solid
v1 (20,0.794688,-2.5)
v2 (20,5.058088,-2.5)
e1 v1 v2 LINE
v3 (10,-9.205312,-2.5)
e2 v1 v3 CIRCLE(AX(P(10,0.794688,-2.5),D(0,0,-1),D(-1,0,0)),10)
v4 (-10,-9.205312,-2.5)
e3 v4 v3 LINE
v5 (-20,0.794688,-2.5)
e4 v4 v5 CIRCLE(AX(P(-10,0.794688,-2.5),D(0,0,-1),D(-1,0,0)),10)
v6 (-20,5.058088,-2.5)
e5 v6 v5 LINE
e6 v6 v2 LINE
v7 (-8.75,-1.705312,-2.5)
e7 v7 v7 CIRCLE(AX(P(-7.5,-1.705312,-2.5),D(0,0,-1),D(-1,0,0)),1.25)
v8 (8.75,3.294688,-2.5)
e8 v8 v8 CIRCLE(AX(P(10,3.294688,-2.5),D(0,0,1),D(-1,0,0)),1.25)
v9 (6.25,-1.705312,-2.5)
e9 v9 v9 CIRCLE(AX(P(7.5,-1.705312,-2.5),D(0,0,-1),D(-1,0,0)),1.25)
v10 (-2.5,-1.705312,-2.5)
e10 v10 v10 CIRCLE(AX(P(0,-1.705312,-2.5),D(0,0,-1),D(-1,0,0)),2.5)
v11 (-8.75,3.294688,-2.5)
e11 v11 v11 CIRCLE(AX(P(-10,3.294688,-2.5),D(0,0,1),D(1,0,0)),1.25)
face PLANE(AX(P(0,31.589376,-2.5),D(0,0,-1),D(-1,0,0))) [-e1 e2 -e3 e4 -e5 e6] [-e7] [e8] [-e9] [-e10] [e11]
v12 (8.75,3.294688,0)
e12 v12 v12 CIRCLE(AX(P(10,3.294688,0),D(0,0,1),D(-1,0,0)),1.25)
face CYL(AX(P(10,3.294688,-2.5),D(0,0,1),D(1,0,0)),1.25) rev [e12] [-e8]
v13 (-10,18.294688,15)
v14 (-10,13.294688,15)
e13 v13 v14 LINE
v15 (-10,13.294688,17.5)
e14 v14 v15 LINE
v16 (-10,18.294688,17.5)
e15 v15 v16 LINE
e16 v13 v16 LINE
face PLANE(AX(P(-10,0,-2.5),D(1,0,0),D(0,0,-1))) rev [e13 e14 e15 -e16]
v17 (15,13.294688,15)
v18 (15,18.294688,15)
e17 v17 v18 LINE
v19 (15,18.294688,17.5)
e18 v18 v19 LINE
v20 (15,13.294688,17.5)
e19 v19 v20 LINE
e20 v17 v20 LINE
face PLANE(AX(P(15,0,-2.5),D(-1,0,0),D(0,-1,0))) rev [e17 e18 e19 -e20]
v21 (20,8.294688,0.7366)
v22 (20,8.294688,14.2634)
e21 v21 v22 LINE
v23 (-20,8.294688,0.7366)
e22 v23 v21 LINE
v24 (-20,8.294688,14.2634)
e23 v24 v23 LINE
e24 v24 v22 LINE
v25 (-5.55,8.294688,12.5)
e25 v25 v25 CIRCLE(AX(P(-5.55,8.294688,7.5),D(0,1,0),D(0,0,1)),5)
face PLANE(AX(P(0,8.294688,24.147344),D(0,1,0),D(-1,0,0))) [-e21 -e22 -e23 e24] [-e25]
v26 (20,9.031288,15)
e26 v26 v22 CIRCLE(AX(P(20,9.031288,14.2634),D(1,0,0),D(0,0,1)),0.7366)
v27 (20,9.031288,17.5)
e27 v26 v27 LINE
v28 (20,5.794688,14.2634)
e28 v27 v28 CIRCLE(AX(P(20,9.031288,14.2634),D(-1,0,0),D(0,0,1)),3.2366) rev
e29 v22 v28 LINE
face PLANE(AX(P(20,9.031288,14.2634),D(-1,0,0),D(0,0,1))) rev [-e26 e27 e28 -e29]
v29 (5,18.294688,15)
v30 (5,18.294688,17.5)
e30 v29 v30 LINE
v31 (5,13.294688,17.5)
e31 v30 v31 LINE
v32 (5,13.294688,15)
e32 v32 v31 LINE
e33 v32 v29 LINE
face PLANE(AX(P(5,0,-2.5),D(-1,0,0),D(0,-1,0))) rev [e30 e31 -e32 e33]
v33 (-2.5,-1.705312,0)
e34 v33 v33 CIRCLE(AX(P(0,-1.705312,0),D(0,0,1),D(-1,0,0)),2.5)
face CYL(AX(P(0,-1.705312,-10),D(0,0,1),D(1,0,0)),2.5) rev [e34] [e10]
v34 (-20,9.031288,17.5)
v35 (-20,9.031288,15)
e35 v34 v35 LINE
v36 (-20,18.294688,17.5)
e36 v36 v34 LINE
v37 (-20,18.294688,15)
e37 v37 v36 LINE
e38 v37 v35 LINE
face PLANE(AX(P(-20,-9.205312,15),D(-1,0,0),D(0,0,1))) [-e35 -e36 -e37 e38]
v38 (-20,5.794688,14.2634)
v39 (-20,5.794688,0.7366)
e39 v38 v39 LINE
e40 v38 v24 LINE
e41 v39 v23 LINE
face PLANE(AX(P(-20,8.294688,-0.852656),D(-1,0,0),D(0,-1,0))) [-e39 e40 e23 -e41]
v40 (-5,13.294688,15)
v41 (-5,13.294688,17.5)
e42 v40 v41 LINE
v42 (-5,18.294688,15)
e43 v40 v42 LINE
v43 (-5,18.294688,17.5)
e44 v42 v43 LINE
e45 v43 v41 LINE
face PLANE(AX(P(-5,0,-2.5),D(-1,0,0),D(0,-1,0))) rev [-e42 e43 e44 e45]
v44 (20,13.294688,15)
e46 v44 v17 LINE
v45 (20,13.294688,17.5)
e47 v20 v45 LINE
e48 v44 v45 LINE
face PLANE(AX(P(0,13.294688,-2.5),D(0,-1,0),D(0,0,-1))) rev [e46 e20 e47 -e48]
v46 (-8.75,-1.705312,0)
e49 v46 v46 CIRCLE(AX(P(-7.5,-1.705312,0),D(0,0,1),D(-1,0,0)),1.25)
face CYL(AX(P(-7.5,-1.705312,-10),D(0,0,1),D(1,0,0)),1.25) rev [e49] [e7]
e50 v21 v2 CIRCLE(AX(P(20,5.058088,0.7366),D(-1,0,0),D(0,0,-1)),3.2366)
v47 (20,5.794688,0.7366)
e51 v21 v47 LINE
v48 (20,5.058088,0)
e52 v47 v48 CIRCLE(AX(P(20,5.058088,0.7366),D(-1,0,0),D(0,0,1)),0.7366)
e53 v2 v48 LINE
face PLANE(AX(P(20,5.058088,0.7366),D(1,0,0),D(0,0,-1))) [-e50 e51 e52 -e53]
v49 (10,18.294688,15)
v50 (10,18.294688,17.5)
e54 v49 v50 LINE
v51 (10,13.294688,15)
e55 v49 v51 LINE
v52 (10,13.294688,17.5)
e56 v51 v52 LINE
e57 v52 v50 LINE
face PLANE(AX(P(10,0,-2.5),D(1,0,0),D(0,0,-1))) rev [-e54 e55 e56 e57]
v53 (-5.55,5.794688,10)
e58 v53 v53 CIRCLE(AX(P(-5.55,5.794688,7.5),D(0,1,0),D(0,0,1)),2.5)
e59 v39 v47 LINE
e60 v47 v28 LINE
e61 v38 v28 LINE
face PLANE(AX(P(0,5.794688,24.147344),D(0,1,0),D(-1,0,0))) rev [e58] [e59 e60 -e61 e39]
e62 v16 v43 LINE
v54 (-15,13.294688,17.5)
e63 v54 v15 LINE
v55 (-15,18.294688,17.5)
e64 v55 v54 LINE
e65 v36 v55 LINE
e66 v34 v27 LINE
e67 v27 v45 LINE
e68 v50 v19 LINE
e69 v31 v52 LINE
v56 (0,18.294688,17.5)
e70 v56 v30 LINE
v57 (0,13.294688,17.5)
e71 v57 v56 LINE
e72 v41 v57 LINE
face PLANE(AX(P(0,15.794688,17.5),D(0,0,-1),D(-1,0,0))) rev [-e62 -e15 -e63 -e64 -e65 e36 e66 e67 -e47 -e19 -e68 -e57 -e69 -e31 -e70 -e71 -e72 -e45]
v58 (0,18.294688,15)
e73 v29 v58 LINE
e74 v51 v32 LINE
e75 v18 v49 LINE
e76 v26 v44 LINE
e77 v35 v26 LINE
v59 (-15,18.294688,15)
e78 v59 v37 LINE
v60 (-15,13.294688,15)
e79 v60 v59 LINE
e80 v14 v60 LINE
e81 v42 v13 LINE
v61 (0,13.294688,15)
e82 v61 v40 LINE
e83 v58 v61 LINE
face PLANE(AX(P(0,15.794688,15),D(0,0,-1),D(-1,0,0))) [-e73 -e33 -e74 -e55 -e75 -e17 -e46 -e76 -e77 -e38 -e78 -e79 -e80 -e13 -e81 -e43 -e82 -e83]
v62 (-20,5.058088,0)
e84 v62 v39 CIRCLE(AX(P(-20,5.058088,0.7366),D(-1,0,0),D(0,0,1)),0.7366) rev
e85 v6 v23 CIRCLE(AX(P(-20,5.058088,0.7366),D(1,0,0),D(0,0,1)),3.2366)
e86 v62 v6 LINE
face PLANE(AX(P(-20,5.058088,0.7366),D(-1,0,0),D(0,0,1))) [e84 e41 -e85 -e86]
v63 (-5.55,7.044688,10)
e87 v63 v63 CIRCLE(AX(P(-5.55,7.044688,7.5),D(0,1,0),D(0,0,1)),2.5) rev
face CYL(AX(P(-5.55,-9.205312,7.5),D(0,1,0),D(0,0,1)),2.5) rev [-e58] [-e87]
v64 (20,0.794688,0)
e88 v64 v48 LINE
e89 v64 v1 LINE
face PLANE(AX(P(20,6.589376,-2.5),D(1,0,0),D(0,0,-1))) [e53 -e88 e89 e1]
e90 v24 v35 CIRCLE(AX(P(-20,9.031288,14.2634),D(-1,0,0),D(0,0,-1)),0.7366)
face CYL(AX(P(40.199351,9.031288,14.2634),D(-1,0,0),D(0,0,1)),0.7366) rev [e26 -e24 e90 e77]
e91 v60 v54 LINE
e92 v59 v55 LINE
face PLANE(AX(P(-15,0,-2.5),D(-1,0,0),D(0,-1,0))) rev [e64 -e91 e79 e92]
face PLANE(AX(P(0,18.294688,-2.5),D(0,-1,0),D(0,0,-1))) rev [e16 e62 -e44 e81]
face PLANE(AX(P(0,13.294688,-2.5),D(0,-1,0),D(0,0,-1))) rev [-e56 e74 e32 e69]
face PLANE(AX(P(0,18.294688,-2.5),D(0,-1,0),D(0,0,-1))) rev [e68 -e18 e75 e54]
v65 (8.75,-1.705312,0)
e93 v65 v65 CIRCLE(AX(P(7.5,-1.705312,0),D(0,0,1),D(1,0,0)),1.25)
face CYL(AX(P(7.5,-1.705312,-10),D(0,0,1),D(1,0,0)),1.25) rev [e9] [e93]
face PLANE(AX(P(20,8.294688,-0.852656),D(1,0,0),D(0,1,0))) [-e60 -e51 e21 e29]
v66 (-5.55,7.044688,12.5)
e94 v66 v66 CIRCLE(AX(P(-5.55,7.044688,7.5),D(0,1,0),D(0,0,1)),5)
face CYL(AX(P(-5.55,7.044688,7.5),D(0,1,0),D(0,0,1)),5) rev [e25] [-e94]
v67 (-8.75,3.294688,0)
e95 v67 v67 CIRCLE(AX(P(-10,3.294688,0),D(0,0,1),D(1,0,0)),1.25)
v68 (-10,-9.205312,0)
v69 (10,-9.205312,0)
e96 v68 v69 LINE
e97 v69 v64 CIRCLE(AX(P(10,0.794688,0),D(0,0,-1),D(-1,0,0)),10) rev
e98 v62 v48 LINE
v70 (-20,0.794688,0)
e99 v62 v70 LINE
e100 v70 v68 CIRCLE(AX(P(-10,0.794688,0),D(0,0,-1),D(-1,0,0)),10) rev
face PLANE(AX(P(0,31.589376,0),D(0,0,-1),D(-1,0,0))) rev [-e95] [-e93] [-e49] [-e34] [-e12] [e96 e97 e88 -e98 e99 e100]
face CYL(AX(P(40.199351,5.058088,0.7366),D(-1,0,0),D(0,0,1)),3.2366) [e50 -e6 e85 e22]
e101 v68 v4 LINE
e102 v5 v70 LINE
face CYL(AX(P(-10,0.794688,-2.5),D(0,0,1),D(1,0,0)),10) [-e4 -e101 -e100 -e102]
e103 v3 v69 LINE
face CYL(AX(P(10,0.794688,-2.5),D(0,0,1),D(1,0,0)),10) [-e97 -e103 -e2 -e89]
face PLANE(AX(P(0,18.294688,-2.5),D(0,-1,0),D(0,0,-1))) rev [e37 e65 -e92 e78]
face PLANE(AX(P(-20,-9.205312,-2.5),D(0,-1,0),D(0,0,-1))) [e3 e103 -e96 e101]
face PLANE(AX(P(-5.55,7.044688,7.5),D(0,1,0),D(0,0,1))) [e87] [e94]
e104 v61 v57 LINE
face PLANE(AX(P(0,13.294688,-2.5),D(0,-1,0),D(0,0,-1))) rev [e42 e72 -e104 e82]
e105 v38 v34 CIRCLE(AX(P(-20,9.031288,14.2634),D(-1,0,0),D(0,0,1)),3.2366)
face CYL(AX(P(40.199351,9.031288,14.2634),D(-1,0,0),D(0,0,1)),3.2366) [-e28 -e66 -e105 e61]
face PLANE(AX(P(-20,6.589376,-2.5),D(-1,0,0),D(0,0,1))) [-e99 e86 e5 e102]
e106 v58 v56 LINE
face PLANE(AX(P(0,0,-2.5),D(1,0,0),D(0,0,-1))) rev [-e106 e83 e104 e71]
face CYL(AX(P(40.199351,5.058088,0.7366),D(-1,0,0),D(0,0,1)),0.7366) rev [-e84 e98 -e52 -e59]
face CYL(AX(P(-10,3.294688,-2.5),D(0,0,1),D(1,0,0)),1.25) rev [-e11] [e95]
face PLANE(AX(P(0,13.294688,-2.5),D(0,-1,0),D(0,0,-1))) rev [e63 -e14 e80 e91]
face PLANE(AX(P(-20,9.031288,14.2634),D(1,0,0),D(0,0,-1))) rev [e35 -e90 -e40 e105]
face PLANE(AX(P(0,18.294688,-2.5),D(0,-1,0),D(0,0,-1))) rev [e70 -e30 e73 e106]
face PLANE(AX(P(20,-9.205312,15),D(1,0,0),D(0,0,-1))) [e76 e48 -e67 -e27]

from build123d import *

# Parameters (mm, degrees)
SKETCH1_W           = 40
SKETCH1_H           = 50
SKETCH1_R           = 1.25
BASE_FLANGE1_DEPTH  = 2.5
SKETCH15_R          = 1
CUT_EXTRUDE3_DEPTH  = 10
JOG3_START          = -2.5
JOG3_OUTLINE_W      = 40
JOG3_OUTLINE_H      = 48.294687966
JOG3_OUTLINE_R      = 1
JOG3_OUTLINE_R_2    = 1.25
JOG3_DEPTH          = 2.5
JOG3_2_OUTLINE_W    = 40
JOG3_2_OUTLINE_H    = 1.705312034
JOG3_2_DEPTH        = 0.332528284
JOG3_START_2        = 14.2634
JOG3_3_OUTLINE_W    = 40
JOG3_3_OUTLINE_H    = 35
JOG3_3_OUTLINE_R    = 1
JOG3_3_OUTLINE_R_2  = 1.25
JOG3_3_DEPTH        = 3.2366
JOG3_4_OUTLINE_W    = 40
JOG3_4_OUTLINE_H    = 15.794687966
JOG3_4_OUTLINE_R    = 1.25
JOG3_4_DEPTH        = 3.2366
JOG3_5_OUTLINE_W    = 40
JOG3_5_OUTLINE_H    = 2.5
JOG3_5_DEPTH        = 15
JOG3_START_3        = 15
JOG3_6_OUTLINE_R    = 1.25
JOG3_6_OUTLINE_R_2  = 1
JOG3_6_DEPTH        = 2.5
JOG3_START_4        = -20
JOG3_7_DEPTH        = 40
JOG4_START          = -20
JOG4_DEPTH          = 40
JOG4_2_DEPTH        = 40
JOG4_START_2        = -3
JOG4_3_OUTLINE_R    = 1.25
JOG4_3_DEPTH        = 4
FILLET1_R           = 10
SKETCH18_R          = 2.5
BOSS_EXTRUDE1_DEPTH = 2.5
SKETCH19_R          = 1
SKETCH19_W          = 23.5
SKETCH19_H          = 12.5
CUT_EXTRUDE4_DEPTH  = 2.5
SKETCH20_R          = 2.5
SKETCH20_R_2        = 1.25
CUT_EXTRUDE6_DEPTH  = 10
SKETCH23_R          = 2.5
CUT_EXTRUDE7_DEPTH  = 44.945989578
SKETCH24_R          = 5
CUT_EXTRUDE8_DEPTH  = 1.25
SKETCH25_W          = 40
SKETCH25_H          = 18.401872862
CUT_EXTRUDE9_DEPTH  = 50.640775238


with BuildPart() as part:
    # Base-Flange1: sheet metal written as solids
    # Sketch1 → Base-Flange1 (new body)
    with BuildSketch(Plane.XY):
        Rectangle(SKETCH1_W, SKETCH1_H)
        with Locations((10, 12.5)):
            Circle(SKETCH1_R, mode=Mode.SUBTRACT)
        with Locations(Location((10, -12.5, 0), (0, 0, 180))):
            Circle(SKETCH1_R, mode=Mode.SUBTRACT)
        with Locations((-10, -12.5)):
            Circle(SKETCH1_R, mode=Mode.SUBTRACT)
        with Locations(Location((-10, 12.5, 0), (0, 0, 180))):
            Circle(SKETCH1_R, mode=Mode.SUBTRACT)
    extrude(amount=-BASE_FLANGE1_DEPTH)

    # Sketch15 → Cut-Extrude3 (cut)
    with BuildSketch(Plane.XY):
        with Locations((12, 0)):
            Circle(SKETCH15_R)
        with Locations(Location((-17, 0, 0), (0, 0, 180))):
            Circle(SKETCH15_R)
    extrude(amount=-CUT_EXTRUDE3_DEPTH, mode=Mode.SUBTRACT)

    # Jog3: read off the stored shape, not the designer's step
    # Jog3 outline → Jog3 (cut)
    with BuildSketch(Plane.XY.offset(JOG3_START)):
        with Locations((0, -0.852656017)):
            Rectangle(JOG3_OUTLINE_W, JOG3_OUTLINE_H)
        with Locations((-17, 0)):
            Circle(JOG3_OUTLINE_R, mode=Mode.SUBTRACT)
        with Locations((12, 0)):
            Circle(JOG3_OUTLINE_R, mode=Mode.SUBTRACT)
        with Locations((-10, 12.5)):
            Circle(JOG3_OUTLINE_R_2, mode=Mode.SUBTRACT)
        with Locations((10, 12.5)):
            Circle(JOG3_OUTLINE_R_2, mode=Mode.SUBTRACT)
        with Locations((10, -12.5)):
            Circle(JOG3_OUTLINE_R_2, mode=Mode.SUBTRACT)
        with Locations((-10, -12.5)):
            Circle(JOG3_OUTLINE_R_2, mode=Mode.SUBTRACT)
    extrude(amount=JOG3_DEPTH, mode=Mode.SUBTRACT)

    # Jog3 2 outline → Jog3 2 (cut)
    with BuildSketch(Plane.XY.offset(JOG3_START)):
        with Locations((0, 24.147343983)):
            Rectangle(JOG3_2_OUTLINE_W, JOG3_2_OUTLINE_H)
    extrude(amount=JOG3_2_DEPTH, mode=Mode.SUBTRACT)

    # Jog3 4 outline → Jog3 4 (add)
    with BuildSketch(Plane.XY.offset(JOG3_START)):
        with Locations((0, 32.897343983)):
            Rectangle(JOG3_4_OUTLINE_W, JOG3_4_OUTLINE_H)
        with Locations((10, 28.294687966)):
            Circle(JOG3_4_OUTLINE_R, mode=Mode.SUBTRACT)
        with Locations((-10, 28.294687966)):
            Circle(JOG3_4_OUTLINE_R, mode=Mode.SUBTRACT)
    extrude(amount=JOG3_4_DEPTH)



with BuildPart() as body_2:
    # Jog3 3 outline → Jog3 3 (new body)
    with BuildSketch(Plane.XY.offset(JOG3_START_2)):
        with Locations((0, 8.294687966)):
            Rectangle(JOG3_3_OUTLINE_W, JOG3_3_OUTLINE_H)
        with Locations((12, 15.794687966)):
            Circle(JOG3_3_OUTLINE_R, mode=Mode.SUBTRACT)
        with Locations((-17, 0)):
            Circle(JOG3_3_OUTLINE_R, mode=Mode.SUBTRACT)
        with Locations((-10, 3.294687966)):
            Circle(JOG3_3_OUTLINE_R_2, mode=Mode.SUBTRACT)
        with Locations((12, 0)):
            Circle(JOG3_3_OUTLINE_R, mode=Mode.SUBTRACT)
        with Locations((10, 3.294687966)):
            Circle(JOG3_3_OUTLINE_R_2, mode=Mode.SUBTRACT)
        with Locations((-17, 15.794687966)):
            Circle(JOG3_3_OUTLINE_R, mode=Mode.SUBTRACT)
        with Locations((-10, 12.5)):
            Circle(JOG3_3_OUTLINE_R_2, mode=Mode.SUBTRACT)
        with Locations((10, 12.5)):
            Circle(JOG3_3_OUTLINE_R_2, mode=Mode.SUBTRACT)
    extrude(amount=JOG3_3_DEPTH)


with BuildPart() as part_1:
    add(part.part)

    add(body_2.part)  # Jog3 5 merges body 2
    # Jog3 5 outline → Jog3 5 (add)
    with BuildSketch(Plane.XY):
        with Locations((0, 24.544687966)):
            Rectangle(JOG3_5_OUTLINE_W, JOG3_5_OUTLINE_H)
    extrude(amount=JOG3_5_DEPTH)

    # Jog3 6 outline → Jog3 6 (add)
    with BuildSketch(Plane.XY.offset(JOG3_START_3)):
        with Locations((10, 12.5)):
            Circle(JOG3_6_OUTLINE_R)
        with Locations((-10, 12.5)):
            Circle(JOG3_6_OUTLINE_R)
        with Locations((12, 0)):
            Circle(JOG3_6_OUTLINE_R_2)
        with Locations((-17, 0)):
            Circle(JOG3_6_OUTLINE_R_2)
    extrude(amount=JOG3_6_DEPTH)

    # Jog3 7 outline → Jog3 7 (cut)
    with BuildSketch(Plane.YZ.offset(JOG3_START_4)):
        with BuildLine():
            ThreePointArc((23.294687966, 14.2634), (23.078942821, 14.784254855), (22.558087966, 15))
            Line((22.558087966, 15), (-9.205312034, 15))
            Line((-9.205312034, 15), (-9.205312034, 14.2634))
            Line((-9.205312034, 14.2634), (23.294687966, 14.2634))
        make_face()
        with BuildLine():
            ThreePointArc((26.531287966, -2.5), (24.242666158, -1.552021808), (23.294687966, 0.7366))
            Line((23.294687966, 0.7366), (23.294687966, -2.167471716))
            Line((23.294687966, -2.167471716), (25, -2.167471716))
            Line((25, -2.167471716), (25, -2.5))
            Line((25, -2.5), (26.531287966, -2.5))
        make_face()
        with BuildLine():
            Line((26.531287966, 0), (40.794687966, 0))
            Line((40.794687966, 0), (40.794687966, 0.7366))
            Line((40.794687966, 0.7366), (25.794687966, 0.7366))
            ThreePointArc((25.794687966, 0.7366), (26.010433111, 0.215745145), (26.531287966, 0))
        make_face()
        with BuildLine():
            Line((25.794687966, 17.5), (22.558087966, 17.5))
            ThreePointArc((22.558087966, 17.5), (24.846709774, 16.552021808), (25.794687966, 14.2634))
            Line((25.794687966, 14.2634), (25.794687966, 17.5))
        make_face()
    extrude(amount=JOG3_7_DEPTH, mode=Mode.SUBTRACT)

    # Jog4: read off the stored shape, not the designer's step
    # Jog4 outline → Jog4 (cut)
    with BuildSketch(Plane.YZ.offset(JOG4_START)):
        with BuildLine():
            Line((-9.205312034, 15), (5.87962174, 15))
            ThreePointArc((5.87962174, 15), (7.019882984, 16.799110859), (9.031287966, 17.5))
            Line((9.031287966, 17.5), (-9.205312034, 17.5))
            Line((-9.205312034, 17.5), (-9.205312034, 15))
        make_face()
    extrude(amount=JOG4_DEPTH, mode=Mode.SUBTRACT)

    # Jog4 2 outline → Jog4 2 (add)
    with BuildSketch(Plane.YZ.offset(JOG4_START)):
        with BuildLine():
            Line((-9.205312034, 0), (-9.205312034, -2.5))
            Line((-9.205312034, -2.5), (5.058087966, -2.5))
            ThreePointArc((5.058087966, -2.5), (7.346709774, -1.552021808), (8.294687966, 0.7366))
            Line((8.294687966, 0.7366), (8.294687966, 14.2634))
            ThreePointArc((8.294687966, 14.2634), (8.510433111, 14.784254855), (9.031287966, 15))
            Line((9.031287966, 15), (5.87962174, 15))
            ThreePointArc((5.87962174, 15), (5.81599152, 14.634140241), (5.794687966, 14.2634))
            Line((5.794687966, 14.2634), (5.794687966, 0.7366))
            ThreePointArc((5.794687966, 0.7366), (5.578942821, 0.215745145), (5.058087966, 0))
            Line((5.058087966, 0), (-9.205312034, 0))
        make_face()
    extrude(amount=JOG4_2_DEPTH)

    # Jog4 3 outline → Jog4 3 (cut)
    with BuildSketch(Plane.XY.offset(JOG4_START_2)):
        with Locations((-10, 3.294687966)):
            Circle(JOG4_3_OUTLINE_R)
        with Locations((10, 3.294687966)):
            Circle(JOG4_3_OUTLINE_R)
    extrude(amount=JOG4_3_DEPTH, mode=Mode.SUBTRACT)

    # Fillet1
    fillet1_edges = [part_1.edges().sort_by_distance(p)[0] for p in [
        (20, -9.205312034, -1.25),
        (-20, -9.205312034, -1.25),
        (-20, 40.794687966, -1.25),
        (20, 40.794687966, -1.25),
    ]]
    fillet(fillet1_edges, radius=FILLET1_R)

    # Sketch18 → Boss-Extrude1 (add)
    with BuildSketch(Plane.XY.offset(17.5)):
        with Locations((12, 15.794687966)):
            Circle(SKETCH18_R)
        with Locations((-17, 15.794687966)):
            Circle(SKETCH18_R)
    extrude(amount=-BOSS_EXTRUDE1_DEPTH)

    # Sketch19 → Cut-Extrude4 (cut)
    with BuildSketch(Plane(origin=(0, 25.794687966, 0), x_dir=(1, 0, 0), z_dir=(0, 1, 0))):
        with Locations(Location((13.9, -7.5, 0), (0, 0, 270))):
            Circle(SKETCH19_R)
        with Locations(Location((-13.9, -7.5, 0), (0, 0, 90))):
            Circle(SKETCH19_R)
        with Locations((0, -7.5)):
            Rectangle(SKETCH19_W, SKETCH19_H)
    extrude(amount=-CUT_EXTRUDE4_DEPTH, mode=Mode.SUBTRACT)

    # Sketch20 → Cut-Extrude6 (cut)
    with BuildSketch(Plane.XY):
        with Locations((0, 33.294687966)):
            Circle(SKETCH20_R)
        with Locations(Location((0, -1.705312034, 0), (0, 0, 180))):
            Circle(SKETCH20_R)
        with Locations((7.5, -1.705312034)):
            Circle(SKETCH20_R_2)
        with Locations(Location((-7.5, -1.705312034, 0), (0, 0, 180))):
            Circle(SKETCH20_R_2)
        with Locations(Location((7.5, 33.294687966, 0), (0, 0, 180))):
            Circle(SKETCH20_R_2)
        with Locations((-7.5, 33.294687966)):
            Circle(SKETCH20_R_2)
    extrude(amount=-CUT_EXTRUDE6_DEPTH, mode=Mode.SUBTRACT)

    # Sketch23 → Cut-Extrude7 (cut, through all)
    with BuildSketch(Plane(origin=(0, 25.794687966, 0), x_dir=(1, 0, 0), z_dir=(0, 1, 0))):
        with Locations(Location((-5.55, -7.5, 0), (0, 0, 270))):
            Circle(SKETCH23_R)
    extrude(amount=-CUT_EXTRUDE7_DEPTH, mode=Mode.SUBTRACT)

    # Sketch24 → Cut-Extrude8 (cut)
    with BuildSketch(Plane(origin=(0, 8.294687966, 0), x_dir=(1, 0, 0), z_dir=(0, 1, 0))):
        with Locations(Location((-5.55, -7.5, 0), (0, 0, 270))):
            Circle(SKETCH24_R)
    extrude(amount=-CUT_EXTRUDE8_DEPTH, mode=Mode.SUBTRACT)

    # Sketch25 → Cut-Extrude9 (cut, through all)
    with BuildSketch(Plane.XY.offset(17.5)):
        Polygon((-20, 22.558087966), (-20, 18.294687966), (-15, 18.294687966), (-15, 13.294687966), (-10, 13.294687966), (-10, 15.794687966), (-10, 18.294687966), (-5, 18.294687966), (-5, 13.294687966), (0, 13.294687966), (0, 15.794687966), (0, 18.294687966), (5, 18.294687966), (5, 13.294687966), (10, 13.294687966), (10, 15.794687966), (10, 18.294687966), (15, 18.294687966), (15, 13.294687966), (20, 13.294687966), (20, 15.794687966), (20, 22.558087966), align=None)
        with Locations((0, 31.759024397)):
            Rectangle(SKETCH25_W, SKETCH25_H)
    extrude(amount=-CUT_EXTRUDE9_DEPTH, mode=Mode.SUBTRACT)


solid = part_1.part
